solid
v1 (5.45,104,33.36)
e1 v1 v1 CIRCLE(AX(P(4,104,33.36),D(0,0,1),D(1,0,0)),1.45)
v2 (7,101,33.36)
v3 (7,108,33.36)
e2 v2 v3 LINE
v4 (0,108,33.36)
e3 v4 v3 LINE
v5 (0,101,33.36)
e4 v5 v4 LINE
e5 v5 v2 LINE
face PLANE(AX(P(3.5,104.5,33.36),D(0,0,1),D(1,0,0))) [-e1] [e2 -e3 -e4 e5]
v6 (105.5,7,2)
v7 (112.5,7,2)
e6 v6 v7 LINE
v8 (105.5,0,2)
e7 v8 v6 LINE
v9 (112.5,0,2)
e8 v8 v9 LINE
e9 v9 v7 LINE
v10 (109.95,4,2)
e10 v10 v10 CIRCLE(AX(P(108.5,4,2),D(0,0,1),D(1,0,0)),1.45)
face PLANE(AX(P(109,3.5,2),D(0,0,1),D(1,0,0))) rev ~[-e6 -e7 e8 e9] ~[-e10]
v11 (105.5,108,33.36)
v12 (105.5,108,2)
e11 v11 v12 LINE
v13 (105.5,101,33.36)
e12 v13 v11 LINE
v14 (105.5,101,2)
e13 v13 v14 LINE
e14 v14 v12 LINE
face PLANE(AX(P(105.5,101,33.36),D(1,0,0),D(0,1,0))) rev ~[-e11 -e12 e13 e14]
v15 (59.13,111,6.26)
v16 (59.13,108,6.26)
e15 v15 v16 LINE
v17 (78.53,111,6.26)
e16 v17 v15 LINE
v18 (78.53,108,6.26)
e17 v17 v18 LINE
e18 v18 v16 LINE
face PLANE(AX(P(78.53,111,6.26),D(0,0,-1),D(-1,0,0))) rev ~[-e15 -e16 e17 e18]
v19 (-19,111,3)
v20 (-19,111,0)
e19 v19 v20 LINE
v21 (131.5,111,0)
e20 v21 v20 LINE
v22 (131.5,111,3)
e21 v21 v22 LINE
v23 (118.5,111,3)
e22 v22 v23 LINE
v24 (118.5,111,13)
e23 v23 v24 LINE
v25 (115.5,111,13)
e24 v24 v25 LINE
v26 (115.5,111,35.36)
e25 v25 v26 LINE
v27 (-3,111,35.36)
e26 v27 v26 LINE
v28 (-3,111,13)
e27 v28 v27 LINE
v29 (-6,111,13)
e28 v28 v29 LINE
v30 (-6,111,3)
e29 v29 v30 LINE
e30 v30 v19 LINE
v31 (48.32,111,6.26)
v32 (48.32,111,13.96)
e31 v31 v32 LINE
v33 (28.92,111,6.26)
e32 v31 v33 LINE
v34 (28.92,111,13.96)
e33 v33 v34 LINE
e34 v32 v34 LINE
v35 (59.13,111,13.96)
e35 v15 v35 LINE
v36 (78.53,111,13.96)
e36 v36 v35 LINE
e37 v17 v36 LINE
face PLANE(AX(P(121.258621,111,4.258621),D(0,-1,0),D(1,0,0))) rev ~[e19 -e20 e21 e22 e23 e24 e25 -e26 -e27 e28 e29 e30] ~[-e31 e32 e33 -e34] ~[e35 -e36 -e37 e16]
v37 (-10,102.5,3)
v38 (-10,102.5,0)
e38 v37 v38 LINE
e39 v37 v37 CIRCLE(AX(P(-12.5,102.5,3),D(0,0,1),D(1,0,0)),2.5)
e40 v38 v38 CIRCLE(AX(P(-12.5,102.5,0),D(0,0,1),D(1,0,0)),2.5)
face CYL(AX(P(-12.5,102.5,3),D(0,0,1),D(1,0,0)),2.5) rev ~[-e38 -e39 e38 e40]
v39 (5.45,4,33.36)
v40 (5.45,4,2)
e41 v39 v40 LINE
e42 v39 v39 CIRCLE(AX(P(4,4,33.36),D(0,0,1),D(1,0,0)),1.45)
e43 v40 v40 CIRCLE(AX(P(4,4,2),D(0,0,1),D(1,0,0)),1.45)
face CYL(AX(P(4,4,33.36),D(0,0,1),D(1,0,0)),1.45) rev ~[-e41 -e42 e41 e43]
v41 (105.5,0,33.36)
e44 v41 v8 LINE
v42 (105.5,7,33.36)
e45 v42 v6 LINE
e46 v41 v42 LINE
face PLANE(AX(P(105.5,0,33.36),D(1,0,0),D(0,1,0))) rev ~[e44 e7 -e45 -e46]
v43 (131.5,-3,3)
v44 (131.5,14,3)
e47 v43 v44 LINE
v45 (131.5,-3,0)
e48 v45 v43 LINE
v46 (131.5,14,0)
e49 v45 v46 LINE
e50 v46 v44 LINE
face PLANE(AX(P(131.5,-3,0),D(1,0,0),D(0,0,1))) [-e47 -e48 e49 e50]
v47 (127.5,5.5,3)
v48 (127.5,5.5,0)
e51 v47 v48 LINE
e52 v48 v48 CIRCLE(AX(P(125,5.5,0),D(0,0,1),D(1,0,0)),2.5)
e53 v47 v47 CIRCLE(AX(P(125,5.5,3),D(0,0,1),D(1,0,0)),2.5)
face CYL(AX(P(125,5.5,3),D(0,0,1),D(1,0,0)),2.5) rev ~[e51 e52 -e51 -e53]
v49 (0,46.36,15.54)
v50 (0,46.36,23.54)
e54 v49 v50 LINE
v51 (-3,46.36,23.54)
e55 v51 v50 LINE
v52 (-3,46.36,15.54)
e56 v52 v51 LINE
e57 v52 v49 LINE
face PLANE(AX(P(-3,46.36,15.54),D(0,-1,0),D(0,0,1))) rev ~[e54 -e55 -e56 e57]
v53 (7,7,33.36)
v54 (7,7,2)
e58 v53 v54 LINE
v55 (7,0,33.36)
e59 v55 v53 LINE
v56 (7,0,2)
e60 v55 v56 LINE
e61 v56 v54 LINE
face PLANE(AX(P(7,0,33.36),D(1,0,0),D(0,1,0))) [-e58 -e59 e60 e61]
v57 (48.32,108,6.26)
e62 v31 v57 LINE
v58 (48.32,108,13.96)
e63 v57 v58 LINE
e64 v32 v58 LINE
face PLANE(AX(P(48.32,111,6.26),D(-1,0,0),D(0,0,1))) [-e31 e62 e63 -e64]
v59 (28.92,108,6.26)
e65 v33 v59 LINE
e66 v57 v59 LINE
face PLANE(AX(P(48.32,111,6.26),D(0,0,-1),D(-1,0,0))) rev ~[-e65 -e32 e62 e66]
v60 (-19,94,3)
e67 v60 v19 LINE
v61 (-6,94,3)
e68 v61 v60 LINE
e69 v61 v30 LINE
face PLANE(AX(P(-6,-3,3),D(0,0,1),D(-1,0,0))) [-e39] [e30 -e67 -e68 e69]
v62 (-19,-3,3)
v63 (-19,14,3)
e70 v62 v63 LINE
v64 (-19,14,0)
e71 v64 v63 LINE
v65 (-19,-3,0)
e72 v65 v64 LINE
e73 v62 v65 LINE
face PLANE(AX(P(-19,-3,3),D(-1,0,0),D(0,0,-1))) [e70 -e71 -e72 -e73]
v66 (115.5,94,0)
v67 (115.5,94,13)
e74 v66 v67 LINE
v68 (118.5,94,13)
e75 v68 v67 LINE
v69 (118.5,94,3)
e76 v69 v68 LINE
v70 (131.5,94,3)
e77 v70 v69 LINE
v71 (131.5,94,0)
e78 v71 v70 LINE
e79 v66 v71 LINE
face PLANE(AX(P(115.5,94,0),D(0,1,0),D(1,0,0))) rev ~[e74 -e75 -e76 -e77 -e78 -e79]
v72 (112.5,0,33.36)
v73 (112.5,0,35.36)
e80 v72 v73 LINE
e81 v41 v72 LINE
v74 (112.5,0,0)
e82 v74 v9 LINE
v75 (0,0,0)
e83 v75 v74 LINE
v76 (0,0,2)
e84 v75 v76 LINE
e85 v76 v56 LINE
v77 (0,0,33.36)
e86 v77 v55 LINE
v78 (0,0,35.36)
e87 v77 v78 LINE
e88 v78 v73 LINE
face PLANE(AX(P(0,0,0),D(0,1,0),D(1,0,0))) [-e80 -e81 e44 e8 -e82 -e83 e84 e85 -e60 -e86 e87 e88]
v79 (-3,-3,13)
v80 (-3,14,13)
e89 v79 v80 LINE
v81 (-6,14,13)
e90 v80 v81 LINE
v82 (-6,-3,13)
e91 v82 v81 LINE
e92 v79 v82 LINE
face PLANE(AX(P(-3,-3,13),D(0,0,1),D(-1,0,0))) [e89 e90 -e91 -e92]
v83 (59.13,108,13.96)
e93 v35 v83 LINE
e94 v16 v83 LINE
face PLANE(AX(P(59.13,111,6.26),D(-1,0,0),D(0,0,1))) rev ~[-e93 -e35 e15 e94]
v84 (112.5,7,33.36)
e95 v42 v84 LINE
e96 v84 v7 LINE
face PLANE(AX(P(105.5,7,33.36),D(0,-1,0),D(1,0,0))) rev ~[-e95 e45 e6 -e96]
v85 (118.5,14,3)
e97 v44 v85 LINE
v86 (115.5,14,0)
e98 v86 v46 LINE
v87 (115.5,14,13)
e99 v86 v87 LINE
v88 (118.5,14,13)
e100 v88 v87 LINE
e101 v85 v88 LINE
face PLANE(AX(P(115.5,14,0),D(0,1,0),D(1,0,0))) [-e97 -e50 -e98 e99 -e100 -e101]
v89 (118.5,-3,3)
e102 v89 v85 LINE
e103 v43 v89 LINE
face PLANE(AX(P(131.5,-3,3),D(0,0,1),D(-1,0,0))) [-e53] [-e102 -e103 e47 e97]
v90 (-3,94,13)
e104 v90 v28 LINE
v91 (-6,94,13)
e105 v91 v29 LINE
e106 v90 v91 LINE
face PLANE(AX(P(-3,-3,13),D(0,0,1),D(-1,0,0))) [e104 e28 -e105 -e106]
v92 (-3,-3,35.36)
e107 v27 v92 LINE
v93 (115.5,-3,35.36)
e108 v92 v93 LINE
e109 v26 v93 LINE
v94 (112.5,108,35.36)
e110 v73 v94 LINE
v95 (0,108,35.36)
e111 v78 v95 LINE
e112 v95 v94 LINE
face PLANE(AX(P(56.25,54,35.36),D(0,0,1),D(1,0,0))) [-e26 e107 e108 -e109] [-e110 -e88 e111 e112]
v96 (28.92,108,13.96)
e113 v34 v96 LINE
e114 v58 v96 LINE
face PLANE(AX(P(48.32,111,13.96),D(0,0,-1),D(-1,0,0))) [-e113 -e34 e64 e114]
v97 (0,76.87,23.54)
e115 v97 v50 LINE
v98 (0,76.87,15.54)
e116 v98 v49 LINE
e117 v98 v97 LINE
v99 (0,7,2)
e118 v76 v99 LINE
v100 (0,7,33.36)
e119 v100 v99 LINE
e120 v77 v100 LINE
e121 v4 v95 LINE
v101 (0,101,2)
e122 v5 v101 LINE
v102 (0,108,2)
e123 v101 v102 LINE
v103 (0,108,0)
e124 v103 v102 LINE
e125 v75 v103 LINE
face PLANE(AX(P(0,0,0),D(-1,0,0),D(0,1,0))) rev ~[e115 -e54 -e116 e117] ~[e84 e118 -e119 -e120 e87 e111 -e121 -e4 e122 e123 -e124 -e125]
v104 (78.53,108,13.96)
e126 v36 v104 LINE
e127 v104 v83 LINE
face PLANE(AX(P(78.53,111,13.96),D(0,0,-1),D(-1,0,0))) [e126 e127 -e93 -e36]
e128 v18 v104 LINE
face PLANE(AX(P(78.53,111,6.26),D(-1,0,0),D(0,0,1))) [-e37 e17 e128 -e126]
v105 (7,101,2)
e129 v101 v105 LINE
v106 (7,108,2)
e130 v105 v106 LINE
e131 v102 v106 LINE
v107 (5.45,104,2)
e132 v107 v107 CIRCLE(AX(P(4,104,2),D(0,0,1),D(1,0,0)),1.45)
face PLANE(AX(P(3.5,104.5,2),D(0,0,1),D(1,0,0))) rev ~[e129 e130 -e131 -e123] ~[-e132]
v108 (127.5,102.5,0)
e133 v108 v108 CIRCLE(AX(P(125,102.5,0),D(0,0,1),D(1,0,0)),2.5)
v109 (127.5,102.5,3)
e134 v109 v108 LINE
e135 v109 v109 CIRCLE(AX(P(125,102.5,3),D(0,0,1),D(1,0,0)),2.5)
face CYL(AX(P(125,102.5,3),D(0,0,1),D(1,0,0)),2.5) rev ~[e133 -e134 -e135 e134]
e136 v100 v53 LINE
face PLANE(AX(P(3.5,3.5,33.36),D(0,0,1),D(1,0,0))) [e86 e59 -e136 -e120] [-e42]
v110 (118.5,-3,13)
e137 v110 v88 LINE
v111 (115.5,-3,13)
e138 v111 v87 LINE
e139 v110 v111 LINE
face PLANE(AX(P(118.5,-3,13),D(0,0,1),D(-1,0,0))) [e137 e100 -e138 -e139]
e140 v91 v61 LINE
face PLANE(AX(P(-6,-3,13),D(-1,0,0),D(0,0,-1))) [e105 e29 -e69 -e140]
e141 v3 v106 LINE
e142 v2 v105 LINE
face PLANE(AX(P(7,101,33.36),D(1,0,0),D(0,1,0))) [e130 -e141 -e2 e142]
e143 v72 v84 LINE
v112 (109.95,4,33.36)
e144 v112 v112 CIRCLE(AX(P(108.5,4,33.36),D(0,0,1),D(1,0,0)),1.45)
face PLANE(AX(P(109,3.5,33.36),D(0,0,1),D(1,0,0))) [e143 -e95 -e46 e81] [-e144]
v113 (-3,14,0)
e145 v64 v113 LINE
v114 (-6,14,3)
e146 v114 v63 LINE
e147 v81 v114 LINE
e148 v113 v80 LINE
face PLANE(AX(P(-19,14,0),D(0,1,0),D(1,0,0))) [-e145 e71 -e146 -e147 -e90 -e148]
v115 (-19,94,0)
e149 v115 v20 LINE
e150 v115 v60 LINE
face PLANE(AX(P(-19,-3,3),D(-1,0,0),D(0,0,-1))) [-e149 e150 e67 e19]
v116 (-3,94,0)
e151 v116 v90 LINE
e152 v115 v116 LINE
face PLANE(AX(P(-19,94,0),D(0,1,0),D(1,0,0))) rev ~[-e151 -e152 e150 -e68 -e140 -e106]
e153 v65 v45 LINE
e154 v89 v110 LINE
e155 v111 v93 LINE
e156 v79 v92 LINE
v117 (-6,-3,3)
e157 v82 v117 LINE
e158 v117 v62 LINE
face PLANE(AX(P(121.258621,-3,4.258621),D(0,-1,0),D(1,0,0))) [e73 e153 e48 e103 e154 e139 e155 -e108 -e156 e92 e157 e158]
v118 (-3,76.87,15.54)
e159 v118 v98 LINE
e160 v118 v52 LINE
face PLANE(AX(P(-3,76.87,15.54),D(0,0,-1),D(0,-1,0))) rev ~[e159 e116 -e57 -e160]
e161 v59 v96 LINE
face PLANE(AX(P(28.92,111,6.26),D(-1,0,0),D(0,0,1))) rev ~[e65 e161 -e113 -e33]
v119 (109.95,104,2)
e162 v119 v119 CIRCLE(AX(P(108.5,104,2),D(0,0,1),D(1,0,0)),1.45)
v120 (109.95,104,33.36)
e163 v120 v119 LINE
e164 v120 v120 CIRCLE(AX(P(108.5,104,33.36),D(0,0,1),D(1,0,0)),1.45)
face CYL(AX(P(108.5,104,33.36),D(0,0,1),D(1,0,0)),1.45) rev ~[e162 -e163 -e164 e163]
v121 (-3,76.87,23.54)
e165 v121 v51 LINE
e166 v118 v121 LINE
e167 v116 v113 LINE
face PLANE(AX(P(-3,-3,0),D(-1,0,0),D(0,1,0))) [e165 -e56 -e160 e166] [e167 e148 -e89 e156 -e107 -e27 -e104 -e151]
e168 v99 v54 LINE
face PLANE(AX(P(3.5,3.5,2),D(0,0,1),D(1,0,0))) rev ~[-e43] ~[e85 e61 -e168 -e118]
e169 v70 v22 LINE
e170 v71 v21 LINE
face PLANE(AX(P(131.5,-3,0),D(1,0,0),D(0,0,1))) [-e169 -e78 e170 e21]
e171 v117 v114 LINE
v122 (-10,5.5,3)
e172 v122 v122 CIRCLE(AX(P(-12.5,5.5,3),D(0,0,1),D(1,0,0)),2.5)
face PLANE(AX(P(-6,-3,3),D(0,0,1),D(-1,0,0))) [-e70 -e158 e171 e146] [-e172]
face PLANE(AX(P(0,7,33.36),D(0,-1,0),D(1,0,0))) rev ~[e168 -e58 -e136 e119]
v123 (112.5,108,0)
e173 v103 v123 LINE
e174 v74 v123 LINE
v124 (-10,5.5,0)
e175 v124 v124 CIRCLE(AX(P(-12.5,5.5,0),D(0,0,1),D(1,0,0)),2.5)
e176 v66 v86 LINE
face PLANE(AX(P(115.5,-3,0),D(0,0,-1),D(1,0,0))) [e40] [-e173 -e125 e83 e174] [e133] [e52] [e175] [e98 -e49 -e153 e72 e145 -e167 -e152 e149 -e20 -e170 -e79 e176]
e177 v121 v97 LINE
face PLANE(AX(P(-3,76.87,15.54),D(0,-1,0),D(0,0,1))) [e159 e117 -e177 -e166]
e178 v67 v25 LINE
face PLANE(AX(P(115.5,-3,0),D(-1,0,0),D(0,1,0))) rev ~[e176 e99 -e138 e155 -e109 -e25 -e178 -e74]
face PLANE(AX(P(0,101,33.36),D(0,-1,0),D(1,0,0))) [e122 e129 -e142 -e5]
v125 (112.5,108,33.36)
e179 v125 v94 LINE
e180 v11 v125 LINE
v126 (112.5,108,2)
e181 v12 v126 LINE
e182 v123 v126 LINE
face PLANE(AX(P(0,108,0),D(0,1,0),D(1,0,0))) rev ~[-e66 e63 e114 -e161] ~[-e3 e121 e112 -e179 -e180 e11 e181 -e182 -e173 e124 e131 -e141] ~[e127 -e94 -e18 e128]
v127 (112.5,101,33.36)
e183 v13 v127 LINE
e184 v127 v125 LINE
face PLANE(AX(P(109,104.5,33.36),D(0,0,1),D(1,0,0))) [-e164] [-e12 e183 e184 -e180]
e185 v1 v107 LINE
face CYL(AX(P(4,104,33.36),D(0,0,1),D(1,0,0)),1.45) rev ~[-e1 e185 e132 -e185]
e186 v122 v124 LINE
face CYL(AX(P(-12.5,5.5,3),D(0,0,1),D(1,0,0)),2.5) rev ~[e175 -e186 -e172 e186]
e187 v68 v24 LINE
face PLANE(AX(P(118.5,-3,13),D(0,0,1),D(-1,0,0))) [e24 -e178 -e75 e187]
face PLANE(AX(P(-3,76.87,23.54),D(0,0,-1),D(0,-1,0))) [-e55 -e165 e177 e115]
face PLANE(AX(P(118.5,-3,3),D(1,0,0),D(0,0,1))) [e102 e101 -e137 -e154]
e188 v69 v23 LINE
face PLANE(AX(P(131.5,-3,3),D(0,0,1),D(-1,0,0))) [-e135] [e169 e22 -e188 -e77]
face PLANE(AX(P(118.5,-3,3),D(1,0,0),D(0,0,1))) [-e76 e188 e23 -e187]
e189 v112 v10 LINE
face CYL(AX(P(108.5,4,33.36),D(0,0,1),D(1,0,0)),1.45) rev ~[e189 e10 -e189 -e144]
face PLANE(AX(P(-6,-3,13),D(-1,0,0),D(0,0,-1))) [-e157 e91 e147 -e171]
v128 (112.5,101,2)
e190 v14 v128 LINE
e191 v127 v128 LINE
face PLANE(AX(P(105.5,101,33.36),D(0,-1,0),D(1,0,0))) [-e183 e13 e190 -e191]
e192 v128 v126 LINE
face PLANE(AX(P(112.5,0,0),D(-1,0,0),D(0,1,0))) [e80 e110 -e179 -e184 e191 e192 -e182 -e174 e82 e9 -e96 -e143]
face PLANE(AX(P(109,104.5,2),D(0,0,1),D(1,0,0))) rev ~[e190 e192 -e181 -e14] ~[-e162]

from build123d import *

# Parameters (mm, degrees)
F0_W      = 118.5
F0_H      = 114
F0_W_2    = 112.5
F0_H_2    = 108
F1_DEPTH  = 35.36
F3_START  = -2
F2_W      = 7
F2_H      = 7
F3_DEPTH  = 31.36
F4_R      = 1.45
F5_DEPTH  = 33.361
F6_W      = 30.51
F6_H      = 8
F7_DEPTH  = 3
F8_W      = 19.4
F8_H      = 7.7
F9_DEPTH  = 3
F11_DEPTH = 114
F13_DEPTH = 114
F15_W     = 16
F15_H     = 80
F16_DEPTH = 35.361
F17_W     = 16
F17_H     = 80
F18_DEPTH = 35.361
F19_R     = 2.5
F20_DEPTH = 3.001


# Not quite as in the source:
# - a feature names something its author has since deleted; it is built from what else it names


with BuildPart() as f1:
    # F0 (on Top) → F1 (new body)
    with BuildSketch(Plane.XY):
        with Locations((56.25, 54)):
            Rectangle(F0_W, F0_H)
        with Locations((56.25, 54)):
            Rectangle(F0_W_2, F0_H_2, mode=Mode.SUBTRACT)
    extrude(amount=F1_DEPTH)

    # F2 (on face) → F3 (join)
    with BuildSketch(Plane.XY.offset(35.36).offset(F3_START)):
        with Locations((3.5, 104.5)):
            Rectangle(F2_W, F2_H)
        with Locations((109, 104.5)):
            Rectangle(F2_W, F2_H)
        with Locations((109, 3.5)):
            Rectangle(F2_W, F2_H)
        with Locations((3.5, 3.5)):
            Rectangle(F2_W, F2_H)
    extrude(amount=-F3_DEPTH)

    # F4 (on face) → F5 (cut, through all)
    with BuildSketch(Plane.XY.offset(33.36)):
        with Locations((4, 104)):
            Circle(F4_R)
        with Locations((108.5, 104)):
            Circle(F4_R)
        with Locations((4, 4)):
            Circle(F4_R)
        with Locations((108.5, 4)):
            Circle(F4_R)
    extrude(amount=-F5_DEPTH, mode=Mode.SUBTRACT)

    # F6 (on face) → F7 (cut, through all)
    with BuildSketch(Plane(origin=(-3, 0, 0), x_dir=(0, -1, 0), z_dir=(-1, 0, 0))):
        with Locations((-61.615, 19.54)):
            Rectangle(F6_W, F6_H)
    extrude(amount=-F7_DEPTH, mode=Mode.SUBTRACT)

    # F8 (on face) → F9 (cut)
    with BuildSketch(Plane(origin=(0, 111, 0), x_dir=(-1, 0, 0), z_dir=(0, 1, 0))):
        with Locations((-68.83, 10.11)):
            Rectangle(F8_W, F8_H)
        with Locations((-38.62, 10.11)):
            Rectangle(F8_W, F8_H)
    extrude(amount=-F9_DEPTH, mode=Mode.SUBTRACT)

    # F10 (on face) → F11 (join)
    with BuildSketch(Plane.XZ.offset(3)):
        Polygon((-6, 3), (-19, 3), (-19, 0), (-3, 0), (-3, 13), (-6, 13), align=None)
    extrude(amount=-F11_DEPTH)

    # F12 (on face) → F13 (join)
    with BuildSketch(Plane.XZ.offset(3)):
        Polygon((118.5, 13), (115.5, 13), (115.5, 0), (131.5, 0), (131.5, 3), (118.5, 3), align=None)
    extrude(amount=-F13_DEPTH)

    # F15 (on face) → F16 (cut, through all)
    with BuildSketch(Plane(origin=(0, 0, 0), x_dir=(1, 0, 0), z_dir=(0, 0, -1))):
        with Locations((-11, -54)):
            Rectangle(F15_W, F15_H)
    extrude(amount=-F16_DEPTH, mode=Mode.SUBTRACT)

    # F17 (on face) → F18 (cut, through all)
    with BuildSketch(Plane(origin=(0, 0, 0), x_dir=(1, 0, 0), z_dir=(0, 0, -1))):
        with Locations((123.5, -54)):
            Rectangle(F17_W, F17_H)
    extrude(amount=-F18_DEPTH, mode=Mode.SUBTRACT)

    # F19 (on face) → F20 (cut, through all)
    with BuildSketch(Plane.XY.offset(3)):
        with Locations((-12.5, 102.5)):
            Circle(F19_R)
        with Locations((125, 102.5)):
            Circle(F19_R)
        with Locations((125, 5.5)):
            Circle(F19_R)
        with Locations((-12.5, 5.5)):
            Circle(F19_R)
    extrude(amount=-F20_DEPTH, mode=Mode.SUBTRACT)


solid = f1.part
